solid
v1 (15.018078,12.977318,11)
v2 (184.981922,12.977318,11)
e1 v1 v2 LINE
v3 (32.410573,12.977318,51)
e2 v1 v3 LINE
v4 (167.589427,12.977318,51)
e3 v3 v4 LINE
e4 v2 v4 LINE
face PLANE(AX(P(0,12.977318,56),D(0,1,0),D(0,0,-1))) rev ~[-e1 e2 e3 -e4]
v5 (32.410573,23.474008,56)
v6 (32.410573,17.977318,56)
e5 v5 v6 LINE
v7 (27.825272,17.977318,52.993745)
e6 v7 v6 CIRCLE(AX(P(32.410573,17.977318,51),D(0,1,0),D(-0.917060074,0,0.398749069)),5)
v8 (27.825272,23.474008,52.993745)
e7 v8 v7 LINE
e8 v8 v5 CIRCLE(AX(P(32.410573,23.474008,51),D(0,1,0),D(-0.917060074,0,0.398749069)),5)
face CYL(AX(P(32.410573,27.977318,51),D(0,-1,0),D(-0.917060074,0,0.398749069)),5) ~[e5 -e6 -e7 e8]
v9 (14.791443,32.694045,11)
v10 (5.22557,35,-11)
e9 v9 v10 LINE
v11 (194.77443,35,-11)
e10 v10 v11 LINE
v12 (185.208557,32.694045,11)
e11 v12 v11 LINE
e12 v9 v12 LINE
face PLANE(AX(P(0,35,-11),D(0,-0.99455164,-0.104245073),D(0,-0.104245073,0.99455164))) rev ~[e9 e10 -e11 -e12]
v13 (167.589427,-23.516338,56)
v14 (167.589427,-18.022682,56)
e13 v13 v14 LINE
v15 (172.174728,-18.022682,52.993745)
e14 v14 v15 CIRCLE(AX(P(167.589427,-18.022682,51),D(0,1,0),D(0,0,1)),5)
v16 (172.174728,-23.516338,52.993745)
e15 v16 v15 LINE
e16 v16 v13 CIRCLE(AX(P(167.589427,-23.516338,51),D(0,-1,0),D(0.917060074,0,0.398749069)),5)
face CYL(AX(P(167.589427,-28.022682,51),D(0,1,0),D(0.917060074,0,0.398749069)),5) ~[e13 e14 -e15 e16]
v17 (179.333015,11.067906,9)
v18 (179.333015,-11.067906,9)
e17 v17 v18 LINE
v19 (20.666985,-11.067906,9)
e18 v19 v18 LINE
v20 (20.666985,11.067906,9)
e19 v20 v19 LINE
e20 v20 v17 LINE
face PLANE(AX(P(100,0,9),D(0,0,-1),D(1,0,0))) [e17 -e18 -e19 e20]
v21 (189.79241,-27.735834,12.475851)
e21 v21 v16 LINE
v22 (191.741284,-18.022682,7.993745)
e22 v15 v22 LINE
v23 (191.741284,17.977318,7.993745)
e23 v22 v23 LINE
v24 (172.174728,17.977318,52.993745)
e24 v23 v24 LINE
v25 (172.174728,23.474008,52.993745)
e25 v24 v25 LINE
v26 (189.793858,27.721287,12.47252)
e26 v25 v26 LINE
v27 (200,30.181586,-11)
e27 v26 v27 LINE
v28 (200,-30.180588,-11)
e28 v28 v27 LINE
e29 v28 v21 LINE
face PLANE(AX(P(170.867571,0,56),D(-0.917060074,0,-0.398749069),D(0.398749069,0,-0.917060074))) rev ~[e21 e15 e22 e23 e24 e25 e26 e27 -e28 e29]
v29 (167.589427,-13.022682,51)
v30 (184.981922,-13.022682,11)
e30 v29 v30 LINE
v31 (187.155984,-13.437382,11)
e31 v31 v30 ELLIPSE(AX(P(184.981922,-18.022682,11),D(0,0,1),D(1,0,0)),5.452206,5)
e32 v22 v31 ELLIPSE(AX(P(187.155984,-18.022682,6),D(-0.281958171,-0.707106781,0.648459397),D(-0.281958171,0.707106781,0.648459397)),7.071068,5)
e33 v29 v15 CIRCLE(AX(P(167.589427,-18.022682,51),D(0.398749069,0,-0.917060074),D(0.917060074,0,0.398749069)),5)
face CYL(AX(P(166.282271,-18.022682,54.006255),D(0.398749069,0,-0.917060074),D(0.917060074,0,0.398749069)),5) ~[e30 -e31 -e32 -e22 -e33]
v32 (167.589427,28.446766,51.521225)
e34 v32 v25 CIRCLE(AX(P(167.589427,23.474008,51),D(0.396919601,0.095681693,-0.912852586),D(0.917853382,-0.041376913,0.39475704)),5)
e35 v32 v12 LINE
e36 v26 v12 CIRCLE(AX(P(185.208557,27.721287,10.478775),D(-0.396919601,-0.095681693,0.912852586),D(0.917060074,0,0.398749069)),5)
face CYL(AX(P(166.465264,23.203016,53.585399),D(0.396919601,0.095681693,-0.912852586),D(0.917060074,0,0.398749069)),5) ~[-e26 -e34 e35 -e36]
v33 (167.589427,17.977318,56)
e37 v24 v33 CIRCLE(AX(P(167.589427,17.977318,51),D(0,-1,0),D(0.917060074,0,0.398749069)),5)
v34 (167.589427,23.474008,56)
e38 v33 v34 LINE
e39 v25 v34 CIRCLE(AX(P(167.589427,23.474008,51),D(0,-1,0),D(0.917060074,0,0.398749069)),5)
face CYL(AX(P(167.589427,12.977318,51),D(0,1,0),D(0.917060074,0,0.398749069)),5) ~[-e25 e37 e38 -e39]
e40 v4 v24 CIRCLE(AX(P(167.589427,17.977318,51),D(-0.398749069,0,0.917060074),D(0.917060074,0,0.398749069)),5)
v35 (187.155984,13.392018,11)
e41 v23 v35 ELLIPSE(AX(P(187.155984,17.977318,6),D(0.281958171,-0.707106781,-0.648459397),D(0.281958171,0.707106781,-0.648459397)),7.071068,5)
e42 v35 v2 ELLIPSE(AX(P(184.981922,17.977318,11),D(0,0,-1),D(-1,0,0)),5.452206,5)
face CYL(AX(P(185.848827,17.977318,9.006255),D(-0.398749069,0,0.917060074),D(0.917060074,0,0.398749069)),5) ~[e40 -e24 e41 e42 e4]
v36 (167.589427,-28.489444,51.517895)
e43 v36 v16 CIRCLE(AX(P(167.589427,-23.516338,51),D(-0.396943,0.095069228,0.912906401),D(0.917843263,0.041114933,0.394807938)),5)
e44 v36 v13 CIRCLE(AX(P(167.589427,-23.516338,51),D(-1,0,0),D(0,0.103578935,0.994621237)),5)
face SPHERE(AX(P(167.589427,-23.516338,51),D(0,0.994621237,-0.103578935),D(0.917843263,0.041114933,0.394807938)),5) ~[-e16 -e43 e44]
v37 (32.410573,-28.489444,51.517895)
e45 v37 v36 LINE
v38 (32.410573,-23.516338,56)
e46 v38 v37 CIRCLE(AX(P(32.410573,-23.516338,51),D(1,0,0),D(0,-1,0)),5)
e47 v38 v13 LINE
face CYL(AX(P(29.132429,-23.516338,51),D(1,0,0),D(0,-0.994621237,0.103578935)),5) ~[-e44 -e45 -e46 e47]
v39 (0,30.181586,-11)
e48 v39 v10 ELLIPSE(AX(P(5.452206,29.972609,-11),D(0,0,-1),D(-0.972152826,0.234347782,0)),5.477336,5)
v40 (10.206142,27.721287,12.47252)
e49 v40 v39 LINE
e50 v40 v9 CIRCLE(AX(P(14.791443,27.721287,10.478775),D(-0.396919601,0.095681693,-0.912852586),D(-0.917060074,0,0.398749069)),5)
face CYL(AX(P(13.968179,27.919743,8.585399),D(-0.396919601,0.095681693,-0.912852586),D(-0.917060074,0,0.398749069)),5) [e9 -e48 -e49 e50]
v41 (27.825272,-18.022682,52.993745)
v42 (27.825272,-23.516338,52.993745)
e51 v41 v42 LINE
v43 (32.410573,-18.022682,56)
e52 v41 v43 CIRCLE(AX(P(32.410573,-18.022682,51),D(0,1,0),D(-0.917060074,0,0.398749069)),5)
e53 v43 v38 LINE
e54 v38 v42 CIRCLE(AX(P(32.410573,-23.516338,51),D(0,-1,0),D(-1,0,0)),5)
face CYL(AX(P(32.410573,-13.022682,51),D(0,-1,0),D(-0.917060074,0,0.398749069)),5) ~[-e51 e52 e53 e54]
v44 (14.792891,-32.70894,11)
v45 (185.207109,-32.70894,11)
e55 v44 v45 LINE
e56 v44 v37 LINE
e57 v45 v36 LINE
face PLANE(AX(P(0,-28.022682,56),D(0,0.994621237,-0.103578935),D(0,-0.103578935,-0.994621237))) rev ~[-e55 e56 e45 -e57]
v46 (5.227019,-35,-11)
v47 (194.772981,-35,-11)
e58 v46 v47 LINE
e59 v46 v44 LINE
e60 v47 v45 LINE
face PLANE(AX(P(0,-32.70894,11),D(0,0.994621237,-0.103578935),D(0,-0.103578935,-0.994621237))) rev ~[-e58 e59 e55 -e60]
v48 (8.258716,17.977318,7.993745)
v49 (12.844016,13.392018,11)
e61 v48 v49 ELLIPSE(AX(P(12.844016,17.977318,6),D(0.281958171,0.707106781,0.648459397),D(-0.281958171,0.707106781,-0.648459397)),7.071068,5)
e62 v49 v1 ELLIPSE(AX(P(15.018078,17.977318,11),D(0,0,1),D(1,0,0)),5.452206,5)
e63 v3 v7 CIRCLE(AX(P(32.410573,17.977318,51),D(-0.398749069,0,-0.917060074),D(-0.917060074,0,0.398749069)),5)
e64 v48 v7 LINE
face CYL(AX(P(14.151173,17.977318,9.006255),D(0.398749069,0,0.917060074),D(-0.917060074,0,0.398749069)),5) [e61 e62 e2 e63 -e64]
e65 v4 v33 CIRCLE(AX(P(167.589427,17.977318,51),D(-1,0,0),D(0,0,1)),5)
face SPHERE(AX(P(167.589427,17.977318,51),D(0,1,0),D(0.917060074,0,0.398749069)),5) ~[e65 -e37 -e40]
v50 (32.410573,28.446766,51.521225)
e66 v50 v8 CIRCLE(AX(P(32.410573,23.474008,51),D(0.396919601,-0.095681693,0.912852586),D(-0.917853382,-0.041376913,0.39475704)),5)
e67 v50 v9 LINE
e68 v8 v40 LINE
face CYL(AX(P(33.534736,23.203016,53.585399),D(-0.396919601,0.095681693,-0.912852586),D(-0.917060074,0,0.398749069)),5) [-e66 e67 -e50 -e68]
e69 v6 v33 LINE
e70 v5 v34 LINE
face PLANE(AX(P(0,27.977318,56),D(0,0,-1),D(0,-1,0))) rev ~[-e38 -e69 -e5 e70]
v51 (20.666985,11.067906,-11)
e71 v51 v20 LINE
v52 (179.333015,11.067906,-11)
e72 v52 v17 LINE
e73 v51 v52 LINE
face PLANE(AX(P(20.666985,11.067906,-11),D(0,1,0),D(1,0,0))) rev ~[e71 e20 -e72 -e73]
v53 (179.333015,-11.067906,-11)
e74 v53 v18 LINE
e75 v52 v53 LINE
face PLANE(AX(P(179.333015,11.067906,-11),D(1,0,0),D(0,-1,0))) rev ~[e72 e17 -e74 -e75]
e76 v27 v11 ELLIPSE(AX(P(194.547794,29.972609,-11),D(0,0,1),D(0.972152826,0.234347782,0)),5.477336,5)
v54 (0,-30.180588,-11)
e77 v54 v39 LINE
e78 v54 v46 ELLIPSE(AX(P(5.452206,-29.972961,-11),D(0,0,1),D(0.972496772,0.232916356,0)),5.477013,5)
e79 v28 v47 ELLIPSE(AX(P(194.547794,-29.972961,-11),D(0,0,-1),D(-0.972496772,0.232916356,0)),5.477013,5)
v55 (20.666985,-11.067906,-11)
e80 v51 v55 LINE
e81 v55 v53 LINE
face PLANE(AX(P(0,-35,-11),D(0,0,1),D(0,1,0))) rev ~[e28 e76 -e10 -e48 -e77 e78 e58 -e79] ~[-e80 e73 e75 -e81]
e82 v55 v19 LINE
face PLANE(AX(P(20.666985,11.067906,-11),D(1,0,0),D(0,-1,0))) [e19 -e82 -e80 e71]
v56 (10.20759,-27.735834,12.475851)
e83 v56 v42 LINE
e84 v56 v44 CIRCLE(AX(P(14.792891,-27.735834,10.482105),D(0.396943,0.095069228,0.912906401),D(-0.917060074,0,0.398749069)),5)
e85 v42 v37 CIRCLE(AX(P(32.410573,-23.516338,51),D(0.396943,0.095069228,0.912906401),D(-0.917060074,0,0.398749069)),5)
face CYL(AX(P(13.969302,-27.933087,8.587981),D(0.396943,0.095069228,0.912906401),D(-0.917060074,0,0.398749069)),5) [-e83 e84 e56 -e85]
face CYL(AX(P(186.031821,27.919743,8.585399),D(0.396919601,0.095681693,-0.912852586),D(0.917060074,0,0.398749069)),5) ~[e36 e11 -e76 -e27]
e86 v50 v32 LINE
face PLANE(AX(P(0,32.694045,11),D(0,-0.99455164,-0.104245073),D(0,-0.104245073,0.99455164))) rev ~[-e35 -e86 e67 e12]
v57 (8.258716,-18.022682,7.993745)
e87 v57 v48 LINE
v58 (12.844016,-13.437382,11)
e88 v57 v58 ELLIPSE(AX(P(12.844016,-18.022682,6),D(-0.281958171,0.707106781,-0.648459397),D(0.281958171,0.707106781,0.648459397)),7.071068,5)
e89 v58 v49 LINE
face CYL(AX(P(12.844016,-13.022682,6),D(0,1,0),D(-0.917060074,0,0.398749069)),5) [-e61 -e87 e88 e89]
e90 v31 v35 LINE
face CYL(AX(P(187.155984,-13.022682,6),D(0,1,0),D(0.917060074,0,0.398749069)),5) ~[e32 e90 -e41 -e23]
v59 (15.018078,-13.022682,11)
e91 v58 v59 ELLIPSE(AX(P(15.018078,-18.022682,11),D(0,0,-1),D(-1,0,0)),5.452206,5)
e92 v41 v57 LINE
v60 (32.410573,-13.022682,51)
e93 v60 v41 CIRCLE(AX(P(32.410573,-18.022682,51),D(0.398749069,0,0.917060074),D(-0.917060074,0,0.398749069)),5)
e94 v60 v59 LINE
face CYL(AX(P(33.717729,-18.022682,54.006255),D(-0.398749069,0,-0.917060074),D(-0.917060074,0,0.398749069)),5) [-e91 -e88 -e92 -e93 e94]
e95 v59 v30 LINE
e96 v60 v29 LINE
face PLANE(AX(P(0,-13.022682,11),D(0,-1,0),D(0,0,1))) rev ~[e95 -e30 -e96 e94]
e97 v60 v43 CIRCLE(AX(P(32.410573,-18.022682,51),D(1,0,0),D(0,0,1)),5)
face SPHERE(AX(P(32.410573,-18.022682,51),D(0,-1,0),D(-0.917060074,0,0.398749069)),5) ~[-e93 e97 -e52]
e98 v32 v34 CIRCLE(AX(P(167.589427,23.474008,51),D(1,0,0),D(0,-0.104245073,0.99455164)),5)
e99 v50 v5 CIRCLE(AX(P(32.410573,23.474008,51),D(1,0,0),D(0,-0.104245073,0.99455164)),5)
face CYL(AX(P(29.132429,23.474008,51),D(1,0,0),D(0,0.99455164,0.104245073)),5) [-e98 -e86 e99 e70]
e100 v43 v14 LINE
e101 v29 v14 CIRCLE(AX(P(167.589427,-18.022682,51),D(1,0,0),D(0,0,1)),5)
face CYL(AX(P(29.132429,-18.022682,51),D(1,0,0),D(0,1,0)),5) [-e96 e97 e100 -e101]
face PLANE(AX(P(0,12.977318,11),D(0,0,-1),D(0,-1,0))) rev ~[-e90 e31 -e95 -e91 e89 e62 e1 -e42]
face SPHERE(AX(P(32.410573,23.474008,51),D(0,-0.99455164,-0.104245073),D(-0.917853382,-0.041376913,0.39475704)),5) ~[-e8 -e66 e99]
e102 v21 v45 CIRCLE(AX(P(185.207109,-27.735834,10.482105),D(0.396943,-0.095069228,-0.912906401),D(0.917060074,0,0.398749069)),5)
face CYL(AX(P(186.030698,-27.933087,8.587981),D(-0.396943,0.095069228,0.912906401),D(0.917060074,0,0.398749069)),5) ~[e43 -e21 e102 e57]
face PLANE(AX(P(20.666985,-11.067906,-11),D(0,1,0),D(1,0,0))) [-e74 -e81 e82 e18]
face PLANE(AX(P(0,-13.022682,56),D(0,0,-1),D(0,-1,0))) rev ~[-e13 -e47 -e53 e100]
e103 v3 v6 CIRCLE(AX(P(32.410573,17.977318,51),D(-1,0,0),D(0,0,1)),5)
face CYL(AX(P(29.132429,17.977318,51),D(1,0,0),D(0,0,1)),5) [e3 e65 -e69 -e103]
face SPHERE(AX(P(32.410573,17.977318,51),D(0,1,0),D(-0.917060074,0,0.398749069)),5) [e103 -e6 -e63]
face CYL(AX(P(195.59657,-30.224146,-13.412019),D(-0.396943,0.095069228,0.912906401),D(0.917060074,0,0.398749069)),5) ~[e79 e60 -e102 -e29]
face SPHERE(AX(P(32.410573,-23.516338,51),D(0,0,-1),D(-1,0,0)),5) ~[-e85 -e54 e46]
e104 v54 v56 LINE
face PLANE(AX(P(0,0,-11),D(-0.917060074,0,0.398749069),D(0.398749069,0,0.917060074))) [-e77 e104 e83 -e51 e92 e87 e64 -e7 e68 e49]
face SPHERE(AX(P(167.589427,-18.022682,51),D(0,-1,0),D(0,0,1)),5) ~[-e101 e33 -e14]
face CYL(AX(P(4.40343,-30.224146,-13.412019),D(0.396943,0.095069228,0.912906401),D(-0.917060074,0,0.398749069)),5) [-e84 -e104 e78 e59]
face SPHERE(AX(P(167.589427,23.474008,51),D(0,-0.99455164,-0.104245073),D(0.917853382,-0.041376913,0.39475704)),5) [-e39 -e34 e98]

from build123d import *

# Parameters (mm, degrees)
F1_DEPTH = 200
F2_W     = 158.6660303175
F2_H     = 22.1358127892
F3_DEPTH = 20
F5_DEPTH = 75
F7_R     = 5


# Not quite as in the source:
# - a feature of the source that left no trace in its solid (it failed there, or was rolled back) is left out
# - a feature names something its author has since deleted; it is built from what else it names


with BuildPart() as f1:
    # F0 (on Right) → F1 (new body)
    with BuildSketch(Plane.YZ):
        Polygon((12.9773180083, 11), (-13.0226819917, 11), (-32.7089403555, 11), (-35, -11), (35, -11), (32.6940447192, 11), align=None)
        Polygon((12.9773180083, 56), (12.9773180083, 11), (32.6940447192, 11), (27.9773180083, 56), align=None)
        Polygon((-32.7089403555, 11), (-13.0226819917, 11), (-13.0226819917, 56), (-28.0226819917, 56), align=None)
    extrude(amount=F1_DEPTH)

    # F2 (on face) → F3 (cut)
    with BuildSketch(Plane(origin=(0, 0, -11), x_dir=(1, 0, 0), z_dir=(0, 0, -1))):
        with Locations((100, 0)):
            Rectangle(F2_W, F2_H)
    extrude(amount=-F3_DEPTH, mode=Mode.SUBTRACT)

    # F4 (on Front) → F5 (cut, symmetric)
    with BuildSketch(Plane.XZ):
        Polygon((0, -11), (29.1324291224, 56), (0, 56), align=None)
        Polygon((200, -11), (200, 56), (170.8675708776, 56), align=None)
    extrude(amount=F5_DEPTH, both=True, mode=Mode.SUBTRACT)

    # F7
    f7_edges = [f1.edges().sort_by_distance(p)[0] for p in [
        (29.132429, 20.477318, 56),
        (9.565872, -0.022682, 11),
        (190.434128, -0.022682, 11),
        (14.566215, -31.511341, 22.5),
        (29.132429, -20.522682, 56),
        (19.349151, -13.022682, 33.5),
        (19.349151, 12.977318, 33.5),
        (14.566215, 31.488659, 22.5),
        (100, -13.022682, 56),
        (180.650849, -13.022682, 33.5),
        (170.867571, 20.477318, 56),
        (180.650849, 12.977318, 33.5),
        (170.867571, -20.522682, 56),
        (185.433785, -31.511341, 22.5),
        (185.433785, 31.488659, 22.5),
        (100, 12.977318, 56),
        (100, -28.022682, 56),
        (100, 27.977318, 56),
    ]]
    fillet(f7_edges, radius=F7_R)


solid = f1.part
